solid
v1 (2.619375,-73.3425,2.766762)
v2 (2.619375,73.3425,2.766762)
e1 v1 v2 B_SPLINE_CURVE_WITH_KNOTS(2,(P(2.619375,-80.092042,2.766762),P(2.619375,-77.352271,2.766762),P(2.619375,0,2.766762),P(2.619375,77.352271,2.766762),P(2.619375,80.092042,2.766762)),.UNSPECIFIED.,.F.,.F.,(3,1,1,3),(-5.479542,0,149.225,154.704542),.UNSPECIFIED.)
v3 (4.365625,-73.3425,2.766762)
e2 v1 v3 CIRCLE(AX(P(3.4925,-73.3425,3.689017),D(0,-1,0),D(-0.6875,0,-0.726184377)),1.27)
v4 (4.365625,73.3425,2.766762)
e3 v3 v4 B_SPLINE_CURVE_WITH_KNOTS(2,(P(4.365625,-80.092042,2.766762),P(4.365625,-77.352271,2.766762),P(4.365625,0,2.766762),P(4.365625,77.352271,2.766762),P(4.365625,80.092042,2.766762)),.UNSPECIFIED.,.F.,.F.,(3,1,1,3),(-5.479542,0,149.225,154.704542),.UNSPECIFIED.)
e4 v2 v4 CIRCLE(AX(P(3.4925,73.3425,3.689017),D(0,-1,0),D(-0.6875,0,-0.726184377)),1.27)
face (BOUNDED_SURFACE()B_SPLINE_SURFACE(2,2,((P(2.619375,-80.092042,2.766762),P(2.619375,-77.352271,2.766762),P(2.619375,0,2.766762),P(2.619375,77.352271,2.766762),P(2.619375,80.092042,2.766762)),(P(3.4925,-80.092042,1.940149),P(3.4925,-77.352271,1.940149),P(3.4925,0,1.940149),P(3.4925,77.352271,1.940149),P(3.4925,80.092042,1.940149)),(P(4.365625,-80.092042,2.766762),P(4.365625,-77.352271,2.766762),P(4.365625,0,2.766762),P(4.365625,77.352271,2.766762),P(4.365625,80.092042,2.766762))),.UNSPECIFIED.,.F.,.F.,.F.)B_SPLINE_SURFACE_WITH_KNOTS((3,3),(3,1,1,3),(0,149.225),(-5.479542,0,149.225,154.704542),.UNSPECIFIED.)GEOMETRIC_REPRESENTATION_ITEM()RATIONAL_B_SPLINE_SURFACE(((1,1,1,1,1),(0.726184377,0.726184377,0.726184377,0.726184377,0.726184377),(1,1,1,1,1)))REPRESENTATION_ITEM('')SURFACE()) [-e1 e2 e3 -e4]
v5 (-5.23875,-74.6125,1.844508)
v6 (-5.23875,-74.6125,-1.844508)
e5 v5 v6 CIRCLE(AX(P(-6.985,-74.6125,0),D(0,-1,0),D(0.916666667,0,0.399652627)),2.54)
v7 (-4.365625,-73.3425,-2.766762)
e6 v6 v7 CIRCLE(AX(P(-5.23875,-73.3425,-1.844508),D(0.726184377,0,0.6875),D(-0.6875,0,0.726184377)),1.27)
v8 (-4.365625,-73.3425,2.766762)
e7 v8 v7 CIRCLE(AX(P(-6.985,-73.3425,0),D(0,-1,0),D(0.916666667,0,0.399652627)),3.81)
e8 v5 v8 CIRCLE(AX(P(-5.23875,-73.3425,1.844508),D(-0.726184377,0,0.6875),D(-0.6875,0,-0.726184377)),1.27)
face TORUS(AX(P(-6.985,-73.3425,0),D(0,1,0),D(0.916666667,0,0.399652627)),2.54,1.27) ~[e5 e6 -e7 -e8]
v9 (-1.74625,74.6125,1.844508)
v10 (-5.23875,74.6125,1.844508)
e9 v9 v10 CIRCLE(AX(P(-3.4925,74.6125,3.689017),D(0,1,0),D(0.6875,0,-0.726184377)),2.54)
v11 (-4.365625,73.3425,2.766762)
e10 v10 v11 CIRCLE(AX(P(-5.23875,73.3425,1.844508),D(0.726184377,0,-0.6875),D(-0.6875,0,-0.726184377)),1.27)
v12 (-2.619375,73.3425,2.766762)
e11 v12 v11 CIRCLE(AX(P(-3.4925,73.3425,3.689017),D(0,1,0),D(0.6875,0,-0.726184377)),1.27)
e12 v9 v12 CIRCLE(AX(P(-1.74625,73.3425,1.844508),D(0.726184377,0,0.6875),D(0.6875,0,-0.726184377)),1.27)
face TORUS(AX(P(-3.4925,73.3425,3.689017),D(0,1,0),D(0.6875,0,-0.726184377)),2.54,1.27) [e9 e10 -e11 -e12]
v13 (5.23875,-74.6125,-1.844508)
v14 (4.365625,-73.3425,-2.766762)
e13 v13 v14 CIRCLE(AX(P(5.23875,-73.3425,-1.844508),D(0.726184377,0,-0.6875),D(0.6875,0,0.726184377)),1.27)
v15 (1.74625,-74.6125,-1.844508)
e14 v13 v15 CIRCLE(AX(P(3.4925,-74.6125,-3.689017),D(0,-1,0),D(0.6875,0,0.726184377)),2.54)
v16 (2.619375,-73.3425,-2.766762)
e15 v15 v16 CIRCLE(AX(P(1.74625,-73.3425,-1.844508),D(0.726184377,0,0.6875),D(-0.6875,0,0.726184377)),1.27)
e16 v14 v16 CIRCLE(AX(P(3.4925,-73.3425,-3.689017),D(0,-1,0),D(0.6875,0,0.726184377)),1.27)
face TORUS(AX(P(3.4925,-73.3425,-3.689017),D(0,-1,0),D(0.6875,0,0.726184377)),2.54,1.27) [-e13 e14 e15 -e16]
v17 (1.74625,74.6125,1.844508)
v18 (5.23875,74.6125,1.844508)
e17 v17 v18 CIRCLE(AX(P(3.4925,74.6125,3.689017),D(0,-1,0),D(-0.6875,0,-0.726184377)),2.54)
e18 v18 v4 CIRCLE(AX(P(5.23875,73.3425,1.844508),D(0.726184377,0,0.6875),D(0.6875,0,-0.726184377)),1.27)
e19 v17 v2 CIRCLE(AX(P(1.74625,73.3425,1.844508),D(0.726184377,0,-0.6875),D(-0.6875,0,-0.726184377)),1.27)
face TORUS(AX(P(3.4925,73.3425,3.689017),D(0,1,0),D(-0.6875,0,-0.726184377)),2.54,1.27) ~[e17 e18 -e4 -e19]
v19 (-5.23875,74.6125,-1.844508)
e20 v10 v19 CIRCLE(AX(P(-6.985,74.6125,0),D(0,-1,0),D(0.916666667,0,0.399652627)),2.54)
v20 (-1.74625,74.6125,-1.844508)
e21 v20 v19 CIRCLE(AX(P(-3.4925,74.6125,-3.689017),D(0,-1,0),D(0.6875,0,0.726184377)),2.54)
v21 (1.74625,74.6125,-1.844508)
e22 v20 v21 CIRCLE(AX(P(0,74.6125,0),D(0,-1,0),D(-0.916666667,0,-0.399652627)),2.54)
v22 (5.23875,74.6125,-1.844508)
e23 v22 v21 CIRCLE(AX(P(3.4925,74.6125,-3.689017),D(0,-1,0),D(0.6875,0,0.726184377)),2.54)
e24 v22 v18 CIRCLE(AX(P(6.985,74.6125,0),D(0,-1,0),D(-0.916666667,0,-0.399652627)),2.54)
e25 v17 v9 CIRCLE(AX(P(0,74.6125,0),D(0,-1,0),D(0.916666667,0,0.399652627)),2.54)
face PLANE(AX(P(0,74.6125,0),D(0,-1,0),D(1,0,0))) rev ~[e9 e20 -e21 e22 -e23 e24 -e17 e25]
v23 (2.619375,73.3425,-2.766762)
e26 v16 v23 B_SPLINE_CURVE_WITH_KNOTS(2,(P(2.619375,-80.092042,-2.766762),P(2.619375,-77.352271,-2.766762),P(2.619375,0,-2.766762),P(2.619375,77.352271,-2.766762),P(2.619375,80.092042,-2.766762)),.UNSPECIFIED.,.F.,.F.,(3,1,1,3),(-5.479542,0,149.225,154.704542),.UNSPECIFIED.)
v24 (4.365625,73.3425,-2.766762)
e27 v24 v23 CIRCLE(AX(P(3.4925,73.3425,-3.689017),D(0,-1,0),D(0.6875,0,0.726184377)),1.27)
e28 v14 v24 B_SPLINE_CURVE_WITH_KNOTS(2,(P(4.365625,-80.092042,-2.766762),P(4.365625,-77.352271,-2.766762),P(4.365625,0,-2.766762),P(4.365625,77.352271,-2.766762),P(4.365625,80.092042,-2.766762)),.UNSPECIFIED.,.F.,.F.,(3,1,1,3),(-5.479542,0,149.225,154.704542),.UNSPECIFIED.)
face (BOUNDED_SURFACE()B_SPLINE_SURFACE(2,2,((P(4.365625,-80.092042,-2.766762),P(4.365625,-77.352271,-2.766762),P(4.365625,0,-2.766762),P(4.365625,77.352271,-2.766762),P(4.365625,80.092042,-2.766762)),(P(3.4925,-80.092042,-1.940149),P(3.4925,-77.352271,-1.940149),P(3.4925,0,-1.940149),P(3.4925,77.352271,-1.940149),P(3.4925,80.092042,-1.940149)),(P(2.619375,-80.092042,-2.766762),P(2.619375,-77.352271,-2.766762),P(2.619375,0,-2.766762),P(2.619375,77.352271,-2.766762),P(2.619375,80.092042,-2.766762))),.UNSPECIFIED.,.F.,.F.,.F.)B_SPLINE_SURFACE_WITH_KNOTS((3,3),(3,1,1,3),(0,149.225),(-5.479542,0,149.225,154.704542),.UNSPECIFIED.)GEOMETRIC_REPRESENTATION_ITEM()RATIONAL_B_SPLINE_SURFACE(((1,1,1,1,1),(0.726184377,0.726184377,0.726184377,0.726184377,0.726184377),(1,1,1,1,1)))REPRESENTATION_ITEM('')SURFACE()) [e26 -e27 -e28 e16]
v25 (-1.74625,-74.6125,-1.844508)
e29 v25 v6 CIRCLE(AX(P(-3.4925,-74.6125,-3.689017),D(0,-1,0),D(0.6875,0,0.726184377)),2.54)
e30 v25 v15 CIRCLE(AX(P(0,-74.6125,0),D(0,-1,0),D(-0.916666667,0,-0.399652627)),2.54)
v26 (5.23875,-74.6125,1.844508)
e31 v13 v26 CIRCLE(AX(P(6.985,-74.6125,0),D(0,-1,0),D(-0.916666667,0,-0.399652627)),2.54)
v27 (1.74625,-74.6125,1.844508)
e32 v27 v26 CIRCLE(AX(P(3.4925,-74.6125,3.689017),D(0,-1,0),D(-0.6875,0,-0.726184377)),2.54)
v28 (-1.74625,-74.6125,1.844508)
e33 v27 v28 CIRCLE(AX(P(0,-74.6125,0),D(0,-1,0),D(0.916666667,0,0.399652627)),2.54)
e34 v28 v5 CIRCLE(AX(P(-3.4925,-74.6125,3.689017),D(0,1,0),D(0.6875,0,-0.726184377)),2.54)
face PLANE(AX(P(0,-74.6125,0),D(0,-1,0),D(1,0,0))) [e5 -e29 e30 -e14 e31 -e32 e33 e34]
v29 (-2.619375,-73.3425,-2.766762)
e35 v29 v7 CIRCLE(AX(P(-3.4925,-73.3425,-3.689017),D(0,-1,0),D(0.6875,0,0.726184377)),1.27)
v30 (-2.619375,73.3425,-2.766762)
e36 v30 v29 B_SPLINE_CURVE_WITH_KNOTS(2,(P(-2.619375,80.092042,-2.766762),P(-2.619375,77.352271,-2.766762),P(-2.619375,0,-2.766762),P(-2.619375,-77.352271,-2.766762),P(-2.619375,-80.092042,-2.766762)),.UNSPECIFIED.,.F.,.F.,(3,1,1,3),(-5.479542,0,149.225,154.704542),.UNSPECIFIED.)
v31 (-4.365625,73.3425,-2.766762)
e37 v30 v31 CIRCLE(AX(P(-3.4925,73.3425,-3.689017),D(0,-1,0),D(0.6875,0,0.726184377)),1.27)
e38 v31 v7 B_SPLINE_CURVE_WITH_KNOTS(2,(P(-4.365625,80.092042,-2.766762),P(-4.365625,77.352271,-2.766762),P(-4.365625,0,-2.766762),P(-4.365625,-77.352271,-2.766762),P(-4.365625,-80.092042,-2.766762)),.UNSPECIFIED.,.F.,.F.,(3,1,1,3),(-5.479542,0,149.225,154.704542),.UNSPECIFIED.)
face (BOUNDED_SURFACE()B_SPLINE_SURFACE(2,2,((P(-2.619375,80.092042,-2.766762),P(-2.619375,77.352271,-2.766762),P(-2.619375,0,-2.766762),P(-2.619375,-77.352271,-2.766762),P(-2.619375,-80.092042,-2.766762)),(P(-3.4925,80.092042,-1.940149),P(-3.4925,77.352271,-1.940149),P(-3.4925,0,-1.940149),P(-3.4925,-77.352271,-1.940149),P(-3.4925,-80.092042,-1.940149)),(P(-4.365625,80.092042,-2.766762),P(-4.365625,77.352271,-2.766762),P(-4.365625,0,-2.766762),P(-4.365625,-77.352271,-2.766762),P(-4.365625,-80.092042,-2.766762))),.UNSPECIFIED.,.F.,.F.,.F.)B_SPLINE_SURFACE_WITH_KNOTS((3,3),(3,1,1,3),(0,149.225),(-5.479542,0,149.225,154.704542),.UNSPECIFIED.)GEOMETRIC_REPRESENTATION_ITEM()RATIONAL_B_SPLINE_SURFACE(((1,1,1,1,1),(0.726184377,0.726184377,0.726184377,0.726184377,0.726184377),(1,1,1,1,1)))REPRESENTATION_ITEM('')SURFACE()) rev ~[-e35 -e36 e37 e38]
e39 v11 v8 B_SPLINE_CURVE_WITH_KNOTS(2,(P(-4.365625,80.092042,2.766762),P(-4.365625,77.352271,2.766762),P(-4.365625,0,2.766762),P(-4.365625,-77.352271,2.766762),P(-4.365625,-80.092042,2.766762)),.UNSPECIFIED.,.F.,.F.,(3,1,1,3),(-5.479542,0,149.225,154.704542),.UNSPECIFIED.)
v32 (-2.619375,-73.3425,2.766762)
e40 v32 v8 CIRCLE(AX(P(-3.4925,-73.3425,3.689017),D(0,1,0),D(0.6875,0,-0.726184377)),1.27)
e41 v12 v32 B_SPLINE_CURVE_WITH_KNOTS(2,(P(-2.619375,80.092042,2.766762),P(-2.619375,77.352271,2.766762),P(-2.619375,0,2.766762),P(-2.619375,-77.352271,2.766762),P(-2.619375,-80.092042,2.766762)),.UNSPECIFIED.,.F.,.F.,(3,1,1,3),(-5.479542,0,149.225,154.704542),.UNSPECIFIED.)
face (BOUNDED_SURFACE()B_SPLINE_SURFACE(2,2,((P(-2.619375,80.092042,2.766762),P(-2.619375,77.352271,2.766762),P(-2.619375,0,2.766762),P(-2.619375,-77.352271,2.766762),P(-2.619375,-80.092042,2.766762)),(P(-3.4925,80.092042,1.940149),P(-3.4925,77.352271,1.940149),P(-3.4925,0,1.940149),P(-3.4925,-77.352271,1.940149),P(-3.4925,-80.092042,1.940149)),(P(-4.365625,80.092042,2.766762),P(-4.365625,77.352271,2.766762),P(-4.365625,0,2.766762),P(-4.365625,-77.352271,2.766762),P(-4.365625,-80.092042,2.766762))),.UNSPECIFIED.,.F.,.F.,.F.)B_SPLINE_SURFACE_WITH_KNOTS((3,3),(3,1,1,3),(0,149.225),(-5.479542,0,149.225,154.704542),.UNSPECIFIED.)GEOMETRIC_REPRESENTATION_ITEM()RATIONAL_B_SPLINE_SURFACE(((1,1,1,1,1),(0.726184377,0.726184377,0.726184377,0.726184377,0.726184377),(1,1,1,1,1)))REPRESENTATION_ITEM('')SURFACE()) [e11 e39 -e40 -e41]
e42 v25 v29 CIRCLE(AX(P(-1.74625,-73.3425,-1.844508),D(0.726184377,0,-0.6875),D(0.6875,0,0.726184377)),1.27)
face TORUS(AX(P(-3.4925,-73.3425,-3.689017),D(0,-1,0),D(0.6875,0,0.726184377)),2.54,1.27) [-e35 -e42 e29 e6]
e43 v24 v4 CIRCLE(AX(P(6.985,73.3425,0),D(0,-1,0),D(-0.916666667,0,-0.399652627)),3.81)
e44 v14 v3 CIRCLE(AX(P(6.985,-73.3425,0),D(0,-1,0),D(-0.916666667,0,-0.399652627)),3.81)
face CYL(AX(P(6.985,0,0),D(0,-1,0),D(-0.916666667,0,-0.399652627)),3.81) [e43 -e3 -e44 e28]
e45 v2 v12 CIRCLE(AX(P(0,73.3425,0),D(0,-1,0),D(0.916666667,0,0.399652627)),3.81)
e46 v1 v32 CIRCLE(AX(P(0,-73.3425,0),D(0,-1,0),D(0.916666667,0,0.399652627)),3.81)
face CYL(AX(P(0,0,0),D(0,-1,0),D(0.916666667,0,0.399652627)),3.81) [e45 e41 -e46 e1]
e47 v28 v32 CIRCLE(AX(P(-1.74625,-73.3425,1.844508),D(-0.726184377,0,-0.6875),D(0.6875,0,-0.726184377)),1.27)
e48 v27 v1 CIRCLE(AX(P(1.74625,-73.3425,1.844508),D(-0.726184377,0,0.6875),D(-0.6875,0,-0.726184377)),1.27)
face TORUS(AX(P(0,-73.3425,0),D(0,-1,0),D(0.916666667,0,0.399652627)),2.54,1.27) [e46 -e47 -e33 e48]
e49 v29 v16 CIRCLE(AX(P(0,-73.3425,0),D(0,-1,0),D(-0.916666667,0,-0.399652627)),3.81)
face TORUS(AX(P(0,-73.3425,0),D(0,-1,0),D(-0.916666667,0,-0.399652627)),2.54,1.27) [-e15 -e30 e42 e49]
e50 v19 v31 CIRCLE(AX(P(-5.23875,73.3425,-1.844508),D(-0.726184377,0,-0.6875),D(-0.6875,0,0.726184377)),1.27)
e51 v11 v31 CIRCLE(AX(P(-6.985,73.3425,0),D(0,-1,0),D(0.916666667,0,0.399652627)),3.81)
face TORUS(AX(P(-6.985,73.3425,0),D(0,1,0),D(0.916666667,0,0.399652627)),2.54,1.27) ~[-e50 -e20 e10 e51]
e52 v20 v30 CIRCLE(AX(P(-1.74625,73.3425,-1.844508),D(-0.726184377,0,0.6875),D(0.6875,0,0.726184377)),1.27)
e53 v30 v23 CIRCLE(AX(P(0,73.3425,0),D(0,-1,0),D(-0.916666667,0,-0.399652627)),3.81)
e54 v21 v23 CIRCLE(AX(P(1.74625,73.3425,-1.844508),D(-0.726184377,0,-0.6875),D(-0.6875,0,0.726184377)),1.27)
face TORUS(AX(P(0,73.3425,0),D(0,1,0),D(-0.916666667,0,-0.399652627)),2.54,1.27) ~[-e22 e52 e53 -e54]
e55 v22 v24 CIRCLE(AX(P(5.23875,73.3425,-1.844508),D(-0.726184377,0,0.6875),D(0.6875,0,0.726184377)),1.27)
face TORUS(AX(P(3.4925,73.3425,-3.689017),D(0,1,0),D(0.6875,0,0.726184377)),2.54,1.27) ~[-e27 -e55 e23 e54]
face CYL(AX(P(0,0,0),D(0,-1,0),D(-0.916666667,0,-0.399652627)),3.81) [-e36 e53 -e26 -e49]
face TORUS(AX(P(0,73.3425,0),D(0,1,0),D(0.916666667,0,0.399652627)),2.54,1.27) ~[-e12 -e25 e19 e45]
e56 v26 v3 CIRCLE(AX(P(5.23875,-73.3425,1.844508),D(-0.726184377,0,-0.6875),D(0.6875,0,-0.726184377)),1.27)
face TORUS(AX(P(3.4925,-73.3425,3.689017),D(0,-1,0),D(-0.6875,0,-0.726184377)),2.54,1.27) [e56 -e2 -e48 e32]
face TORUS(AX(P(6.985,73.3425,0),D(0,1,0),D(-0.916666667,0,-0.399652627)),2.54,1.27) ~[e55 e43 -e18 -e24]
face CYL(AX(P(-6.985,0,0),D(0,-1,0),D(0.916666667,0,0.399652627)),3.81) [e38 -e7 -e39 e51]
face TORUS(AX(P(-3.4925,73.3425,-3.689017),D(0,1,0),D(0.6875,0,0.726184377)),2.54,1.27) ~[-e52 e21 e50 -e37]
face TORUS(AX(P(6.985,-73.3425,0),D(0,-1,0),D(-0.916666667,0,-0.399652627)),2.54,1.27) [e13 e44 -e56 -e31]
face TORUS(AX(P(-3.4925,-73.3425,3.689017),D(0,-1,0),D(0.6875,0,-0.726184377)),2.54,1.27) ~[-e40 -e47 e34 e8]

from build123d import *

# Parameters (mm, degrees)
F1_DEPTH = 74.6125
F2_R     = 1.27


with BuildPart() as f1:
    # F0 (on Front) → F1 (new body, symmetric)
    with BuildSketch(Plane.XZ):
        with BuildLine():
            ThreePointArc((3.4925, 1.5226765087), (0, 3.81), (-3.4925, 1.5226765087))
            ThreePointArc((-3.4925, 1.5226765087), (-10.795, 0), (-3.4925, -1.5226765087))
            ThreePointArc((-3.4925, -1.5226765087), (0, -3.81), (3.4925, -1.5226765087))
            ThreePointArc((3.4925, -1.5226765087), (10.795, 0), (3.4925, 1.5226765087))
        make_face()
    extrude(amount=F1_DEPTH, both=True)

    # F2
    f2_edges = [f1.edges().sort_by_distance(p)[0] for p in [
        (3.4925, 0, 1.522677),
        (-3.4925, 0, 1.522677),
        (-3.4925, 0, -1.522677),
        (3.4925, 0, -1.522677),
        (0, -74.6125, 3.81),
        (0, 74.6125, 3.81),
        (10.795, 74.6125, 0),
        (10.795, -74.6125, 0),
        (0, 74.6125, -3.81),
        (0, -74.6125, -3.81),
        (-10.795, 74.6125, 0),
        (-10.795, -74.6125, 0),
    ]]
    fillet(f2_edges, radius=F2_R)


solid = f1.part
